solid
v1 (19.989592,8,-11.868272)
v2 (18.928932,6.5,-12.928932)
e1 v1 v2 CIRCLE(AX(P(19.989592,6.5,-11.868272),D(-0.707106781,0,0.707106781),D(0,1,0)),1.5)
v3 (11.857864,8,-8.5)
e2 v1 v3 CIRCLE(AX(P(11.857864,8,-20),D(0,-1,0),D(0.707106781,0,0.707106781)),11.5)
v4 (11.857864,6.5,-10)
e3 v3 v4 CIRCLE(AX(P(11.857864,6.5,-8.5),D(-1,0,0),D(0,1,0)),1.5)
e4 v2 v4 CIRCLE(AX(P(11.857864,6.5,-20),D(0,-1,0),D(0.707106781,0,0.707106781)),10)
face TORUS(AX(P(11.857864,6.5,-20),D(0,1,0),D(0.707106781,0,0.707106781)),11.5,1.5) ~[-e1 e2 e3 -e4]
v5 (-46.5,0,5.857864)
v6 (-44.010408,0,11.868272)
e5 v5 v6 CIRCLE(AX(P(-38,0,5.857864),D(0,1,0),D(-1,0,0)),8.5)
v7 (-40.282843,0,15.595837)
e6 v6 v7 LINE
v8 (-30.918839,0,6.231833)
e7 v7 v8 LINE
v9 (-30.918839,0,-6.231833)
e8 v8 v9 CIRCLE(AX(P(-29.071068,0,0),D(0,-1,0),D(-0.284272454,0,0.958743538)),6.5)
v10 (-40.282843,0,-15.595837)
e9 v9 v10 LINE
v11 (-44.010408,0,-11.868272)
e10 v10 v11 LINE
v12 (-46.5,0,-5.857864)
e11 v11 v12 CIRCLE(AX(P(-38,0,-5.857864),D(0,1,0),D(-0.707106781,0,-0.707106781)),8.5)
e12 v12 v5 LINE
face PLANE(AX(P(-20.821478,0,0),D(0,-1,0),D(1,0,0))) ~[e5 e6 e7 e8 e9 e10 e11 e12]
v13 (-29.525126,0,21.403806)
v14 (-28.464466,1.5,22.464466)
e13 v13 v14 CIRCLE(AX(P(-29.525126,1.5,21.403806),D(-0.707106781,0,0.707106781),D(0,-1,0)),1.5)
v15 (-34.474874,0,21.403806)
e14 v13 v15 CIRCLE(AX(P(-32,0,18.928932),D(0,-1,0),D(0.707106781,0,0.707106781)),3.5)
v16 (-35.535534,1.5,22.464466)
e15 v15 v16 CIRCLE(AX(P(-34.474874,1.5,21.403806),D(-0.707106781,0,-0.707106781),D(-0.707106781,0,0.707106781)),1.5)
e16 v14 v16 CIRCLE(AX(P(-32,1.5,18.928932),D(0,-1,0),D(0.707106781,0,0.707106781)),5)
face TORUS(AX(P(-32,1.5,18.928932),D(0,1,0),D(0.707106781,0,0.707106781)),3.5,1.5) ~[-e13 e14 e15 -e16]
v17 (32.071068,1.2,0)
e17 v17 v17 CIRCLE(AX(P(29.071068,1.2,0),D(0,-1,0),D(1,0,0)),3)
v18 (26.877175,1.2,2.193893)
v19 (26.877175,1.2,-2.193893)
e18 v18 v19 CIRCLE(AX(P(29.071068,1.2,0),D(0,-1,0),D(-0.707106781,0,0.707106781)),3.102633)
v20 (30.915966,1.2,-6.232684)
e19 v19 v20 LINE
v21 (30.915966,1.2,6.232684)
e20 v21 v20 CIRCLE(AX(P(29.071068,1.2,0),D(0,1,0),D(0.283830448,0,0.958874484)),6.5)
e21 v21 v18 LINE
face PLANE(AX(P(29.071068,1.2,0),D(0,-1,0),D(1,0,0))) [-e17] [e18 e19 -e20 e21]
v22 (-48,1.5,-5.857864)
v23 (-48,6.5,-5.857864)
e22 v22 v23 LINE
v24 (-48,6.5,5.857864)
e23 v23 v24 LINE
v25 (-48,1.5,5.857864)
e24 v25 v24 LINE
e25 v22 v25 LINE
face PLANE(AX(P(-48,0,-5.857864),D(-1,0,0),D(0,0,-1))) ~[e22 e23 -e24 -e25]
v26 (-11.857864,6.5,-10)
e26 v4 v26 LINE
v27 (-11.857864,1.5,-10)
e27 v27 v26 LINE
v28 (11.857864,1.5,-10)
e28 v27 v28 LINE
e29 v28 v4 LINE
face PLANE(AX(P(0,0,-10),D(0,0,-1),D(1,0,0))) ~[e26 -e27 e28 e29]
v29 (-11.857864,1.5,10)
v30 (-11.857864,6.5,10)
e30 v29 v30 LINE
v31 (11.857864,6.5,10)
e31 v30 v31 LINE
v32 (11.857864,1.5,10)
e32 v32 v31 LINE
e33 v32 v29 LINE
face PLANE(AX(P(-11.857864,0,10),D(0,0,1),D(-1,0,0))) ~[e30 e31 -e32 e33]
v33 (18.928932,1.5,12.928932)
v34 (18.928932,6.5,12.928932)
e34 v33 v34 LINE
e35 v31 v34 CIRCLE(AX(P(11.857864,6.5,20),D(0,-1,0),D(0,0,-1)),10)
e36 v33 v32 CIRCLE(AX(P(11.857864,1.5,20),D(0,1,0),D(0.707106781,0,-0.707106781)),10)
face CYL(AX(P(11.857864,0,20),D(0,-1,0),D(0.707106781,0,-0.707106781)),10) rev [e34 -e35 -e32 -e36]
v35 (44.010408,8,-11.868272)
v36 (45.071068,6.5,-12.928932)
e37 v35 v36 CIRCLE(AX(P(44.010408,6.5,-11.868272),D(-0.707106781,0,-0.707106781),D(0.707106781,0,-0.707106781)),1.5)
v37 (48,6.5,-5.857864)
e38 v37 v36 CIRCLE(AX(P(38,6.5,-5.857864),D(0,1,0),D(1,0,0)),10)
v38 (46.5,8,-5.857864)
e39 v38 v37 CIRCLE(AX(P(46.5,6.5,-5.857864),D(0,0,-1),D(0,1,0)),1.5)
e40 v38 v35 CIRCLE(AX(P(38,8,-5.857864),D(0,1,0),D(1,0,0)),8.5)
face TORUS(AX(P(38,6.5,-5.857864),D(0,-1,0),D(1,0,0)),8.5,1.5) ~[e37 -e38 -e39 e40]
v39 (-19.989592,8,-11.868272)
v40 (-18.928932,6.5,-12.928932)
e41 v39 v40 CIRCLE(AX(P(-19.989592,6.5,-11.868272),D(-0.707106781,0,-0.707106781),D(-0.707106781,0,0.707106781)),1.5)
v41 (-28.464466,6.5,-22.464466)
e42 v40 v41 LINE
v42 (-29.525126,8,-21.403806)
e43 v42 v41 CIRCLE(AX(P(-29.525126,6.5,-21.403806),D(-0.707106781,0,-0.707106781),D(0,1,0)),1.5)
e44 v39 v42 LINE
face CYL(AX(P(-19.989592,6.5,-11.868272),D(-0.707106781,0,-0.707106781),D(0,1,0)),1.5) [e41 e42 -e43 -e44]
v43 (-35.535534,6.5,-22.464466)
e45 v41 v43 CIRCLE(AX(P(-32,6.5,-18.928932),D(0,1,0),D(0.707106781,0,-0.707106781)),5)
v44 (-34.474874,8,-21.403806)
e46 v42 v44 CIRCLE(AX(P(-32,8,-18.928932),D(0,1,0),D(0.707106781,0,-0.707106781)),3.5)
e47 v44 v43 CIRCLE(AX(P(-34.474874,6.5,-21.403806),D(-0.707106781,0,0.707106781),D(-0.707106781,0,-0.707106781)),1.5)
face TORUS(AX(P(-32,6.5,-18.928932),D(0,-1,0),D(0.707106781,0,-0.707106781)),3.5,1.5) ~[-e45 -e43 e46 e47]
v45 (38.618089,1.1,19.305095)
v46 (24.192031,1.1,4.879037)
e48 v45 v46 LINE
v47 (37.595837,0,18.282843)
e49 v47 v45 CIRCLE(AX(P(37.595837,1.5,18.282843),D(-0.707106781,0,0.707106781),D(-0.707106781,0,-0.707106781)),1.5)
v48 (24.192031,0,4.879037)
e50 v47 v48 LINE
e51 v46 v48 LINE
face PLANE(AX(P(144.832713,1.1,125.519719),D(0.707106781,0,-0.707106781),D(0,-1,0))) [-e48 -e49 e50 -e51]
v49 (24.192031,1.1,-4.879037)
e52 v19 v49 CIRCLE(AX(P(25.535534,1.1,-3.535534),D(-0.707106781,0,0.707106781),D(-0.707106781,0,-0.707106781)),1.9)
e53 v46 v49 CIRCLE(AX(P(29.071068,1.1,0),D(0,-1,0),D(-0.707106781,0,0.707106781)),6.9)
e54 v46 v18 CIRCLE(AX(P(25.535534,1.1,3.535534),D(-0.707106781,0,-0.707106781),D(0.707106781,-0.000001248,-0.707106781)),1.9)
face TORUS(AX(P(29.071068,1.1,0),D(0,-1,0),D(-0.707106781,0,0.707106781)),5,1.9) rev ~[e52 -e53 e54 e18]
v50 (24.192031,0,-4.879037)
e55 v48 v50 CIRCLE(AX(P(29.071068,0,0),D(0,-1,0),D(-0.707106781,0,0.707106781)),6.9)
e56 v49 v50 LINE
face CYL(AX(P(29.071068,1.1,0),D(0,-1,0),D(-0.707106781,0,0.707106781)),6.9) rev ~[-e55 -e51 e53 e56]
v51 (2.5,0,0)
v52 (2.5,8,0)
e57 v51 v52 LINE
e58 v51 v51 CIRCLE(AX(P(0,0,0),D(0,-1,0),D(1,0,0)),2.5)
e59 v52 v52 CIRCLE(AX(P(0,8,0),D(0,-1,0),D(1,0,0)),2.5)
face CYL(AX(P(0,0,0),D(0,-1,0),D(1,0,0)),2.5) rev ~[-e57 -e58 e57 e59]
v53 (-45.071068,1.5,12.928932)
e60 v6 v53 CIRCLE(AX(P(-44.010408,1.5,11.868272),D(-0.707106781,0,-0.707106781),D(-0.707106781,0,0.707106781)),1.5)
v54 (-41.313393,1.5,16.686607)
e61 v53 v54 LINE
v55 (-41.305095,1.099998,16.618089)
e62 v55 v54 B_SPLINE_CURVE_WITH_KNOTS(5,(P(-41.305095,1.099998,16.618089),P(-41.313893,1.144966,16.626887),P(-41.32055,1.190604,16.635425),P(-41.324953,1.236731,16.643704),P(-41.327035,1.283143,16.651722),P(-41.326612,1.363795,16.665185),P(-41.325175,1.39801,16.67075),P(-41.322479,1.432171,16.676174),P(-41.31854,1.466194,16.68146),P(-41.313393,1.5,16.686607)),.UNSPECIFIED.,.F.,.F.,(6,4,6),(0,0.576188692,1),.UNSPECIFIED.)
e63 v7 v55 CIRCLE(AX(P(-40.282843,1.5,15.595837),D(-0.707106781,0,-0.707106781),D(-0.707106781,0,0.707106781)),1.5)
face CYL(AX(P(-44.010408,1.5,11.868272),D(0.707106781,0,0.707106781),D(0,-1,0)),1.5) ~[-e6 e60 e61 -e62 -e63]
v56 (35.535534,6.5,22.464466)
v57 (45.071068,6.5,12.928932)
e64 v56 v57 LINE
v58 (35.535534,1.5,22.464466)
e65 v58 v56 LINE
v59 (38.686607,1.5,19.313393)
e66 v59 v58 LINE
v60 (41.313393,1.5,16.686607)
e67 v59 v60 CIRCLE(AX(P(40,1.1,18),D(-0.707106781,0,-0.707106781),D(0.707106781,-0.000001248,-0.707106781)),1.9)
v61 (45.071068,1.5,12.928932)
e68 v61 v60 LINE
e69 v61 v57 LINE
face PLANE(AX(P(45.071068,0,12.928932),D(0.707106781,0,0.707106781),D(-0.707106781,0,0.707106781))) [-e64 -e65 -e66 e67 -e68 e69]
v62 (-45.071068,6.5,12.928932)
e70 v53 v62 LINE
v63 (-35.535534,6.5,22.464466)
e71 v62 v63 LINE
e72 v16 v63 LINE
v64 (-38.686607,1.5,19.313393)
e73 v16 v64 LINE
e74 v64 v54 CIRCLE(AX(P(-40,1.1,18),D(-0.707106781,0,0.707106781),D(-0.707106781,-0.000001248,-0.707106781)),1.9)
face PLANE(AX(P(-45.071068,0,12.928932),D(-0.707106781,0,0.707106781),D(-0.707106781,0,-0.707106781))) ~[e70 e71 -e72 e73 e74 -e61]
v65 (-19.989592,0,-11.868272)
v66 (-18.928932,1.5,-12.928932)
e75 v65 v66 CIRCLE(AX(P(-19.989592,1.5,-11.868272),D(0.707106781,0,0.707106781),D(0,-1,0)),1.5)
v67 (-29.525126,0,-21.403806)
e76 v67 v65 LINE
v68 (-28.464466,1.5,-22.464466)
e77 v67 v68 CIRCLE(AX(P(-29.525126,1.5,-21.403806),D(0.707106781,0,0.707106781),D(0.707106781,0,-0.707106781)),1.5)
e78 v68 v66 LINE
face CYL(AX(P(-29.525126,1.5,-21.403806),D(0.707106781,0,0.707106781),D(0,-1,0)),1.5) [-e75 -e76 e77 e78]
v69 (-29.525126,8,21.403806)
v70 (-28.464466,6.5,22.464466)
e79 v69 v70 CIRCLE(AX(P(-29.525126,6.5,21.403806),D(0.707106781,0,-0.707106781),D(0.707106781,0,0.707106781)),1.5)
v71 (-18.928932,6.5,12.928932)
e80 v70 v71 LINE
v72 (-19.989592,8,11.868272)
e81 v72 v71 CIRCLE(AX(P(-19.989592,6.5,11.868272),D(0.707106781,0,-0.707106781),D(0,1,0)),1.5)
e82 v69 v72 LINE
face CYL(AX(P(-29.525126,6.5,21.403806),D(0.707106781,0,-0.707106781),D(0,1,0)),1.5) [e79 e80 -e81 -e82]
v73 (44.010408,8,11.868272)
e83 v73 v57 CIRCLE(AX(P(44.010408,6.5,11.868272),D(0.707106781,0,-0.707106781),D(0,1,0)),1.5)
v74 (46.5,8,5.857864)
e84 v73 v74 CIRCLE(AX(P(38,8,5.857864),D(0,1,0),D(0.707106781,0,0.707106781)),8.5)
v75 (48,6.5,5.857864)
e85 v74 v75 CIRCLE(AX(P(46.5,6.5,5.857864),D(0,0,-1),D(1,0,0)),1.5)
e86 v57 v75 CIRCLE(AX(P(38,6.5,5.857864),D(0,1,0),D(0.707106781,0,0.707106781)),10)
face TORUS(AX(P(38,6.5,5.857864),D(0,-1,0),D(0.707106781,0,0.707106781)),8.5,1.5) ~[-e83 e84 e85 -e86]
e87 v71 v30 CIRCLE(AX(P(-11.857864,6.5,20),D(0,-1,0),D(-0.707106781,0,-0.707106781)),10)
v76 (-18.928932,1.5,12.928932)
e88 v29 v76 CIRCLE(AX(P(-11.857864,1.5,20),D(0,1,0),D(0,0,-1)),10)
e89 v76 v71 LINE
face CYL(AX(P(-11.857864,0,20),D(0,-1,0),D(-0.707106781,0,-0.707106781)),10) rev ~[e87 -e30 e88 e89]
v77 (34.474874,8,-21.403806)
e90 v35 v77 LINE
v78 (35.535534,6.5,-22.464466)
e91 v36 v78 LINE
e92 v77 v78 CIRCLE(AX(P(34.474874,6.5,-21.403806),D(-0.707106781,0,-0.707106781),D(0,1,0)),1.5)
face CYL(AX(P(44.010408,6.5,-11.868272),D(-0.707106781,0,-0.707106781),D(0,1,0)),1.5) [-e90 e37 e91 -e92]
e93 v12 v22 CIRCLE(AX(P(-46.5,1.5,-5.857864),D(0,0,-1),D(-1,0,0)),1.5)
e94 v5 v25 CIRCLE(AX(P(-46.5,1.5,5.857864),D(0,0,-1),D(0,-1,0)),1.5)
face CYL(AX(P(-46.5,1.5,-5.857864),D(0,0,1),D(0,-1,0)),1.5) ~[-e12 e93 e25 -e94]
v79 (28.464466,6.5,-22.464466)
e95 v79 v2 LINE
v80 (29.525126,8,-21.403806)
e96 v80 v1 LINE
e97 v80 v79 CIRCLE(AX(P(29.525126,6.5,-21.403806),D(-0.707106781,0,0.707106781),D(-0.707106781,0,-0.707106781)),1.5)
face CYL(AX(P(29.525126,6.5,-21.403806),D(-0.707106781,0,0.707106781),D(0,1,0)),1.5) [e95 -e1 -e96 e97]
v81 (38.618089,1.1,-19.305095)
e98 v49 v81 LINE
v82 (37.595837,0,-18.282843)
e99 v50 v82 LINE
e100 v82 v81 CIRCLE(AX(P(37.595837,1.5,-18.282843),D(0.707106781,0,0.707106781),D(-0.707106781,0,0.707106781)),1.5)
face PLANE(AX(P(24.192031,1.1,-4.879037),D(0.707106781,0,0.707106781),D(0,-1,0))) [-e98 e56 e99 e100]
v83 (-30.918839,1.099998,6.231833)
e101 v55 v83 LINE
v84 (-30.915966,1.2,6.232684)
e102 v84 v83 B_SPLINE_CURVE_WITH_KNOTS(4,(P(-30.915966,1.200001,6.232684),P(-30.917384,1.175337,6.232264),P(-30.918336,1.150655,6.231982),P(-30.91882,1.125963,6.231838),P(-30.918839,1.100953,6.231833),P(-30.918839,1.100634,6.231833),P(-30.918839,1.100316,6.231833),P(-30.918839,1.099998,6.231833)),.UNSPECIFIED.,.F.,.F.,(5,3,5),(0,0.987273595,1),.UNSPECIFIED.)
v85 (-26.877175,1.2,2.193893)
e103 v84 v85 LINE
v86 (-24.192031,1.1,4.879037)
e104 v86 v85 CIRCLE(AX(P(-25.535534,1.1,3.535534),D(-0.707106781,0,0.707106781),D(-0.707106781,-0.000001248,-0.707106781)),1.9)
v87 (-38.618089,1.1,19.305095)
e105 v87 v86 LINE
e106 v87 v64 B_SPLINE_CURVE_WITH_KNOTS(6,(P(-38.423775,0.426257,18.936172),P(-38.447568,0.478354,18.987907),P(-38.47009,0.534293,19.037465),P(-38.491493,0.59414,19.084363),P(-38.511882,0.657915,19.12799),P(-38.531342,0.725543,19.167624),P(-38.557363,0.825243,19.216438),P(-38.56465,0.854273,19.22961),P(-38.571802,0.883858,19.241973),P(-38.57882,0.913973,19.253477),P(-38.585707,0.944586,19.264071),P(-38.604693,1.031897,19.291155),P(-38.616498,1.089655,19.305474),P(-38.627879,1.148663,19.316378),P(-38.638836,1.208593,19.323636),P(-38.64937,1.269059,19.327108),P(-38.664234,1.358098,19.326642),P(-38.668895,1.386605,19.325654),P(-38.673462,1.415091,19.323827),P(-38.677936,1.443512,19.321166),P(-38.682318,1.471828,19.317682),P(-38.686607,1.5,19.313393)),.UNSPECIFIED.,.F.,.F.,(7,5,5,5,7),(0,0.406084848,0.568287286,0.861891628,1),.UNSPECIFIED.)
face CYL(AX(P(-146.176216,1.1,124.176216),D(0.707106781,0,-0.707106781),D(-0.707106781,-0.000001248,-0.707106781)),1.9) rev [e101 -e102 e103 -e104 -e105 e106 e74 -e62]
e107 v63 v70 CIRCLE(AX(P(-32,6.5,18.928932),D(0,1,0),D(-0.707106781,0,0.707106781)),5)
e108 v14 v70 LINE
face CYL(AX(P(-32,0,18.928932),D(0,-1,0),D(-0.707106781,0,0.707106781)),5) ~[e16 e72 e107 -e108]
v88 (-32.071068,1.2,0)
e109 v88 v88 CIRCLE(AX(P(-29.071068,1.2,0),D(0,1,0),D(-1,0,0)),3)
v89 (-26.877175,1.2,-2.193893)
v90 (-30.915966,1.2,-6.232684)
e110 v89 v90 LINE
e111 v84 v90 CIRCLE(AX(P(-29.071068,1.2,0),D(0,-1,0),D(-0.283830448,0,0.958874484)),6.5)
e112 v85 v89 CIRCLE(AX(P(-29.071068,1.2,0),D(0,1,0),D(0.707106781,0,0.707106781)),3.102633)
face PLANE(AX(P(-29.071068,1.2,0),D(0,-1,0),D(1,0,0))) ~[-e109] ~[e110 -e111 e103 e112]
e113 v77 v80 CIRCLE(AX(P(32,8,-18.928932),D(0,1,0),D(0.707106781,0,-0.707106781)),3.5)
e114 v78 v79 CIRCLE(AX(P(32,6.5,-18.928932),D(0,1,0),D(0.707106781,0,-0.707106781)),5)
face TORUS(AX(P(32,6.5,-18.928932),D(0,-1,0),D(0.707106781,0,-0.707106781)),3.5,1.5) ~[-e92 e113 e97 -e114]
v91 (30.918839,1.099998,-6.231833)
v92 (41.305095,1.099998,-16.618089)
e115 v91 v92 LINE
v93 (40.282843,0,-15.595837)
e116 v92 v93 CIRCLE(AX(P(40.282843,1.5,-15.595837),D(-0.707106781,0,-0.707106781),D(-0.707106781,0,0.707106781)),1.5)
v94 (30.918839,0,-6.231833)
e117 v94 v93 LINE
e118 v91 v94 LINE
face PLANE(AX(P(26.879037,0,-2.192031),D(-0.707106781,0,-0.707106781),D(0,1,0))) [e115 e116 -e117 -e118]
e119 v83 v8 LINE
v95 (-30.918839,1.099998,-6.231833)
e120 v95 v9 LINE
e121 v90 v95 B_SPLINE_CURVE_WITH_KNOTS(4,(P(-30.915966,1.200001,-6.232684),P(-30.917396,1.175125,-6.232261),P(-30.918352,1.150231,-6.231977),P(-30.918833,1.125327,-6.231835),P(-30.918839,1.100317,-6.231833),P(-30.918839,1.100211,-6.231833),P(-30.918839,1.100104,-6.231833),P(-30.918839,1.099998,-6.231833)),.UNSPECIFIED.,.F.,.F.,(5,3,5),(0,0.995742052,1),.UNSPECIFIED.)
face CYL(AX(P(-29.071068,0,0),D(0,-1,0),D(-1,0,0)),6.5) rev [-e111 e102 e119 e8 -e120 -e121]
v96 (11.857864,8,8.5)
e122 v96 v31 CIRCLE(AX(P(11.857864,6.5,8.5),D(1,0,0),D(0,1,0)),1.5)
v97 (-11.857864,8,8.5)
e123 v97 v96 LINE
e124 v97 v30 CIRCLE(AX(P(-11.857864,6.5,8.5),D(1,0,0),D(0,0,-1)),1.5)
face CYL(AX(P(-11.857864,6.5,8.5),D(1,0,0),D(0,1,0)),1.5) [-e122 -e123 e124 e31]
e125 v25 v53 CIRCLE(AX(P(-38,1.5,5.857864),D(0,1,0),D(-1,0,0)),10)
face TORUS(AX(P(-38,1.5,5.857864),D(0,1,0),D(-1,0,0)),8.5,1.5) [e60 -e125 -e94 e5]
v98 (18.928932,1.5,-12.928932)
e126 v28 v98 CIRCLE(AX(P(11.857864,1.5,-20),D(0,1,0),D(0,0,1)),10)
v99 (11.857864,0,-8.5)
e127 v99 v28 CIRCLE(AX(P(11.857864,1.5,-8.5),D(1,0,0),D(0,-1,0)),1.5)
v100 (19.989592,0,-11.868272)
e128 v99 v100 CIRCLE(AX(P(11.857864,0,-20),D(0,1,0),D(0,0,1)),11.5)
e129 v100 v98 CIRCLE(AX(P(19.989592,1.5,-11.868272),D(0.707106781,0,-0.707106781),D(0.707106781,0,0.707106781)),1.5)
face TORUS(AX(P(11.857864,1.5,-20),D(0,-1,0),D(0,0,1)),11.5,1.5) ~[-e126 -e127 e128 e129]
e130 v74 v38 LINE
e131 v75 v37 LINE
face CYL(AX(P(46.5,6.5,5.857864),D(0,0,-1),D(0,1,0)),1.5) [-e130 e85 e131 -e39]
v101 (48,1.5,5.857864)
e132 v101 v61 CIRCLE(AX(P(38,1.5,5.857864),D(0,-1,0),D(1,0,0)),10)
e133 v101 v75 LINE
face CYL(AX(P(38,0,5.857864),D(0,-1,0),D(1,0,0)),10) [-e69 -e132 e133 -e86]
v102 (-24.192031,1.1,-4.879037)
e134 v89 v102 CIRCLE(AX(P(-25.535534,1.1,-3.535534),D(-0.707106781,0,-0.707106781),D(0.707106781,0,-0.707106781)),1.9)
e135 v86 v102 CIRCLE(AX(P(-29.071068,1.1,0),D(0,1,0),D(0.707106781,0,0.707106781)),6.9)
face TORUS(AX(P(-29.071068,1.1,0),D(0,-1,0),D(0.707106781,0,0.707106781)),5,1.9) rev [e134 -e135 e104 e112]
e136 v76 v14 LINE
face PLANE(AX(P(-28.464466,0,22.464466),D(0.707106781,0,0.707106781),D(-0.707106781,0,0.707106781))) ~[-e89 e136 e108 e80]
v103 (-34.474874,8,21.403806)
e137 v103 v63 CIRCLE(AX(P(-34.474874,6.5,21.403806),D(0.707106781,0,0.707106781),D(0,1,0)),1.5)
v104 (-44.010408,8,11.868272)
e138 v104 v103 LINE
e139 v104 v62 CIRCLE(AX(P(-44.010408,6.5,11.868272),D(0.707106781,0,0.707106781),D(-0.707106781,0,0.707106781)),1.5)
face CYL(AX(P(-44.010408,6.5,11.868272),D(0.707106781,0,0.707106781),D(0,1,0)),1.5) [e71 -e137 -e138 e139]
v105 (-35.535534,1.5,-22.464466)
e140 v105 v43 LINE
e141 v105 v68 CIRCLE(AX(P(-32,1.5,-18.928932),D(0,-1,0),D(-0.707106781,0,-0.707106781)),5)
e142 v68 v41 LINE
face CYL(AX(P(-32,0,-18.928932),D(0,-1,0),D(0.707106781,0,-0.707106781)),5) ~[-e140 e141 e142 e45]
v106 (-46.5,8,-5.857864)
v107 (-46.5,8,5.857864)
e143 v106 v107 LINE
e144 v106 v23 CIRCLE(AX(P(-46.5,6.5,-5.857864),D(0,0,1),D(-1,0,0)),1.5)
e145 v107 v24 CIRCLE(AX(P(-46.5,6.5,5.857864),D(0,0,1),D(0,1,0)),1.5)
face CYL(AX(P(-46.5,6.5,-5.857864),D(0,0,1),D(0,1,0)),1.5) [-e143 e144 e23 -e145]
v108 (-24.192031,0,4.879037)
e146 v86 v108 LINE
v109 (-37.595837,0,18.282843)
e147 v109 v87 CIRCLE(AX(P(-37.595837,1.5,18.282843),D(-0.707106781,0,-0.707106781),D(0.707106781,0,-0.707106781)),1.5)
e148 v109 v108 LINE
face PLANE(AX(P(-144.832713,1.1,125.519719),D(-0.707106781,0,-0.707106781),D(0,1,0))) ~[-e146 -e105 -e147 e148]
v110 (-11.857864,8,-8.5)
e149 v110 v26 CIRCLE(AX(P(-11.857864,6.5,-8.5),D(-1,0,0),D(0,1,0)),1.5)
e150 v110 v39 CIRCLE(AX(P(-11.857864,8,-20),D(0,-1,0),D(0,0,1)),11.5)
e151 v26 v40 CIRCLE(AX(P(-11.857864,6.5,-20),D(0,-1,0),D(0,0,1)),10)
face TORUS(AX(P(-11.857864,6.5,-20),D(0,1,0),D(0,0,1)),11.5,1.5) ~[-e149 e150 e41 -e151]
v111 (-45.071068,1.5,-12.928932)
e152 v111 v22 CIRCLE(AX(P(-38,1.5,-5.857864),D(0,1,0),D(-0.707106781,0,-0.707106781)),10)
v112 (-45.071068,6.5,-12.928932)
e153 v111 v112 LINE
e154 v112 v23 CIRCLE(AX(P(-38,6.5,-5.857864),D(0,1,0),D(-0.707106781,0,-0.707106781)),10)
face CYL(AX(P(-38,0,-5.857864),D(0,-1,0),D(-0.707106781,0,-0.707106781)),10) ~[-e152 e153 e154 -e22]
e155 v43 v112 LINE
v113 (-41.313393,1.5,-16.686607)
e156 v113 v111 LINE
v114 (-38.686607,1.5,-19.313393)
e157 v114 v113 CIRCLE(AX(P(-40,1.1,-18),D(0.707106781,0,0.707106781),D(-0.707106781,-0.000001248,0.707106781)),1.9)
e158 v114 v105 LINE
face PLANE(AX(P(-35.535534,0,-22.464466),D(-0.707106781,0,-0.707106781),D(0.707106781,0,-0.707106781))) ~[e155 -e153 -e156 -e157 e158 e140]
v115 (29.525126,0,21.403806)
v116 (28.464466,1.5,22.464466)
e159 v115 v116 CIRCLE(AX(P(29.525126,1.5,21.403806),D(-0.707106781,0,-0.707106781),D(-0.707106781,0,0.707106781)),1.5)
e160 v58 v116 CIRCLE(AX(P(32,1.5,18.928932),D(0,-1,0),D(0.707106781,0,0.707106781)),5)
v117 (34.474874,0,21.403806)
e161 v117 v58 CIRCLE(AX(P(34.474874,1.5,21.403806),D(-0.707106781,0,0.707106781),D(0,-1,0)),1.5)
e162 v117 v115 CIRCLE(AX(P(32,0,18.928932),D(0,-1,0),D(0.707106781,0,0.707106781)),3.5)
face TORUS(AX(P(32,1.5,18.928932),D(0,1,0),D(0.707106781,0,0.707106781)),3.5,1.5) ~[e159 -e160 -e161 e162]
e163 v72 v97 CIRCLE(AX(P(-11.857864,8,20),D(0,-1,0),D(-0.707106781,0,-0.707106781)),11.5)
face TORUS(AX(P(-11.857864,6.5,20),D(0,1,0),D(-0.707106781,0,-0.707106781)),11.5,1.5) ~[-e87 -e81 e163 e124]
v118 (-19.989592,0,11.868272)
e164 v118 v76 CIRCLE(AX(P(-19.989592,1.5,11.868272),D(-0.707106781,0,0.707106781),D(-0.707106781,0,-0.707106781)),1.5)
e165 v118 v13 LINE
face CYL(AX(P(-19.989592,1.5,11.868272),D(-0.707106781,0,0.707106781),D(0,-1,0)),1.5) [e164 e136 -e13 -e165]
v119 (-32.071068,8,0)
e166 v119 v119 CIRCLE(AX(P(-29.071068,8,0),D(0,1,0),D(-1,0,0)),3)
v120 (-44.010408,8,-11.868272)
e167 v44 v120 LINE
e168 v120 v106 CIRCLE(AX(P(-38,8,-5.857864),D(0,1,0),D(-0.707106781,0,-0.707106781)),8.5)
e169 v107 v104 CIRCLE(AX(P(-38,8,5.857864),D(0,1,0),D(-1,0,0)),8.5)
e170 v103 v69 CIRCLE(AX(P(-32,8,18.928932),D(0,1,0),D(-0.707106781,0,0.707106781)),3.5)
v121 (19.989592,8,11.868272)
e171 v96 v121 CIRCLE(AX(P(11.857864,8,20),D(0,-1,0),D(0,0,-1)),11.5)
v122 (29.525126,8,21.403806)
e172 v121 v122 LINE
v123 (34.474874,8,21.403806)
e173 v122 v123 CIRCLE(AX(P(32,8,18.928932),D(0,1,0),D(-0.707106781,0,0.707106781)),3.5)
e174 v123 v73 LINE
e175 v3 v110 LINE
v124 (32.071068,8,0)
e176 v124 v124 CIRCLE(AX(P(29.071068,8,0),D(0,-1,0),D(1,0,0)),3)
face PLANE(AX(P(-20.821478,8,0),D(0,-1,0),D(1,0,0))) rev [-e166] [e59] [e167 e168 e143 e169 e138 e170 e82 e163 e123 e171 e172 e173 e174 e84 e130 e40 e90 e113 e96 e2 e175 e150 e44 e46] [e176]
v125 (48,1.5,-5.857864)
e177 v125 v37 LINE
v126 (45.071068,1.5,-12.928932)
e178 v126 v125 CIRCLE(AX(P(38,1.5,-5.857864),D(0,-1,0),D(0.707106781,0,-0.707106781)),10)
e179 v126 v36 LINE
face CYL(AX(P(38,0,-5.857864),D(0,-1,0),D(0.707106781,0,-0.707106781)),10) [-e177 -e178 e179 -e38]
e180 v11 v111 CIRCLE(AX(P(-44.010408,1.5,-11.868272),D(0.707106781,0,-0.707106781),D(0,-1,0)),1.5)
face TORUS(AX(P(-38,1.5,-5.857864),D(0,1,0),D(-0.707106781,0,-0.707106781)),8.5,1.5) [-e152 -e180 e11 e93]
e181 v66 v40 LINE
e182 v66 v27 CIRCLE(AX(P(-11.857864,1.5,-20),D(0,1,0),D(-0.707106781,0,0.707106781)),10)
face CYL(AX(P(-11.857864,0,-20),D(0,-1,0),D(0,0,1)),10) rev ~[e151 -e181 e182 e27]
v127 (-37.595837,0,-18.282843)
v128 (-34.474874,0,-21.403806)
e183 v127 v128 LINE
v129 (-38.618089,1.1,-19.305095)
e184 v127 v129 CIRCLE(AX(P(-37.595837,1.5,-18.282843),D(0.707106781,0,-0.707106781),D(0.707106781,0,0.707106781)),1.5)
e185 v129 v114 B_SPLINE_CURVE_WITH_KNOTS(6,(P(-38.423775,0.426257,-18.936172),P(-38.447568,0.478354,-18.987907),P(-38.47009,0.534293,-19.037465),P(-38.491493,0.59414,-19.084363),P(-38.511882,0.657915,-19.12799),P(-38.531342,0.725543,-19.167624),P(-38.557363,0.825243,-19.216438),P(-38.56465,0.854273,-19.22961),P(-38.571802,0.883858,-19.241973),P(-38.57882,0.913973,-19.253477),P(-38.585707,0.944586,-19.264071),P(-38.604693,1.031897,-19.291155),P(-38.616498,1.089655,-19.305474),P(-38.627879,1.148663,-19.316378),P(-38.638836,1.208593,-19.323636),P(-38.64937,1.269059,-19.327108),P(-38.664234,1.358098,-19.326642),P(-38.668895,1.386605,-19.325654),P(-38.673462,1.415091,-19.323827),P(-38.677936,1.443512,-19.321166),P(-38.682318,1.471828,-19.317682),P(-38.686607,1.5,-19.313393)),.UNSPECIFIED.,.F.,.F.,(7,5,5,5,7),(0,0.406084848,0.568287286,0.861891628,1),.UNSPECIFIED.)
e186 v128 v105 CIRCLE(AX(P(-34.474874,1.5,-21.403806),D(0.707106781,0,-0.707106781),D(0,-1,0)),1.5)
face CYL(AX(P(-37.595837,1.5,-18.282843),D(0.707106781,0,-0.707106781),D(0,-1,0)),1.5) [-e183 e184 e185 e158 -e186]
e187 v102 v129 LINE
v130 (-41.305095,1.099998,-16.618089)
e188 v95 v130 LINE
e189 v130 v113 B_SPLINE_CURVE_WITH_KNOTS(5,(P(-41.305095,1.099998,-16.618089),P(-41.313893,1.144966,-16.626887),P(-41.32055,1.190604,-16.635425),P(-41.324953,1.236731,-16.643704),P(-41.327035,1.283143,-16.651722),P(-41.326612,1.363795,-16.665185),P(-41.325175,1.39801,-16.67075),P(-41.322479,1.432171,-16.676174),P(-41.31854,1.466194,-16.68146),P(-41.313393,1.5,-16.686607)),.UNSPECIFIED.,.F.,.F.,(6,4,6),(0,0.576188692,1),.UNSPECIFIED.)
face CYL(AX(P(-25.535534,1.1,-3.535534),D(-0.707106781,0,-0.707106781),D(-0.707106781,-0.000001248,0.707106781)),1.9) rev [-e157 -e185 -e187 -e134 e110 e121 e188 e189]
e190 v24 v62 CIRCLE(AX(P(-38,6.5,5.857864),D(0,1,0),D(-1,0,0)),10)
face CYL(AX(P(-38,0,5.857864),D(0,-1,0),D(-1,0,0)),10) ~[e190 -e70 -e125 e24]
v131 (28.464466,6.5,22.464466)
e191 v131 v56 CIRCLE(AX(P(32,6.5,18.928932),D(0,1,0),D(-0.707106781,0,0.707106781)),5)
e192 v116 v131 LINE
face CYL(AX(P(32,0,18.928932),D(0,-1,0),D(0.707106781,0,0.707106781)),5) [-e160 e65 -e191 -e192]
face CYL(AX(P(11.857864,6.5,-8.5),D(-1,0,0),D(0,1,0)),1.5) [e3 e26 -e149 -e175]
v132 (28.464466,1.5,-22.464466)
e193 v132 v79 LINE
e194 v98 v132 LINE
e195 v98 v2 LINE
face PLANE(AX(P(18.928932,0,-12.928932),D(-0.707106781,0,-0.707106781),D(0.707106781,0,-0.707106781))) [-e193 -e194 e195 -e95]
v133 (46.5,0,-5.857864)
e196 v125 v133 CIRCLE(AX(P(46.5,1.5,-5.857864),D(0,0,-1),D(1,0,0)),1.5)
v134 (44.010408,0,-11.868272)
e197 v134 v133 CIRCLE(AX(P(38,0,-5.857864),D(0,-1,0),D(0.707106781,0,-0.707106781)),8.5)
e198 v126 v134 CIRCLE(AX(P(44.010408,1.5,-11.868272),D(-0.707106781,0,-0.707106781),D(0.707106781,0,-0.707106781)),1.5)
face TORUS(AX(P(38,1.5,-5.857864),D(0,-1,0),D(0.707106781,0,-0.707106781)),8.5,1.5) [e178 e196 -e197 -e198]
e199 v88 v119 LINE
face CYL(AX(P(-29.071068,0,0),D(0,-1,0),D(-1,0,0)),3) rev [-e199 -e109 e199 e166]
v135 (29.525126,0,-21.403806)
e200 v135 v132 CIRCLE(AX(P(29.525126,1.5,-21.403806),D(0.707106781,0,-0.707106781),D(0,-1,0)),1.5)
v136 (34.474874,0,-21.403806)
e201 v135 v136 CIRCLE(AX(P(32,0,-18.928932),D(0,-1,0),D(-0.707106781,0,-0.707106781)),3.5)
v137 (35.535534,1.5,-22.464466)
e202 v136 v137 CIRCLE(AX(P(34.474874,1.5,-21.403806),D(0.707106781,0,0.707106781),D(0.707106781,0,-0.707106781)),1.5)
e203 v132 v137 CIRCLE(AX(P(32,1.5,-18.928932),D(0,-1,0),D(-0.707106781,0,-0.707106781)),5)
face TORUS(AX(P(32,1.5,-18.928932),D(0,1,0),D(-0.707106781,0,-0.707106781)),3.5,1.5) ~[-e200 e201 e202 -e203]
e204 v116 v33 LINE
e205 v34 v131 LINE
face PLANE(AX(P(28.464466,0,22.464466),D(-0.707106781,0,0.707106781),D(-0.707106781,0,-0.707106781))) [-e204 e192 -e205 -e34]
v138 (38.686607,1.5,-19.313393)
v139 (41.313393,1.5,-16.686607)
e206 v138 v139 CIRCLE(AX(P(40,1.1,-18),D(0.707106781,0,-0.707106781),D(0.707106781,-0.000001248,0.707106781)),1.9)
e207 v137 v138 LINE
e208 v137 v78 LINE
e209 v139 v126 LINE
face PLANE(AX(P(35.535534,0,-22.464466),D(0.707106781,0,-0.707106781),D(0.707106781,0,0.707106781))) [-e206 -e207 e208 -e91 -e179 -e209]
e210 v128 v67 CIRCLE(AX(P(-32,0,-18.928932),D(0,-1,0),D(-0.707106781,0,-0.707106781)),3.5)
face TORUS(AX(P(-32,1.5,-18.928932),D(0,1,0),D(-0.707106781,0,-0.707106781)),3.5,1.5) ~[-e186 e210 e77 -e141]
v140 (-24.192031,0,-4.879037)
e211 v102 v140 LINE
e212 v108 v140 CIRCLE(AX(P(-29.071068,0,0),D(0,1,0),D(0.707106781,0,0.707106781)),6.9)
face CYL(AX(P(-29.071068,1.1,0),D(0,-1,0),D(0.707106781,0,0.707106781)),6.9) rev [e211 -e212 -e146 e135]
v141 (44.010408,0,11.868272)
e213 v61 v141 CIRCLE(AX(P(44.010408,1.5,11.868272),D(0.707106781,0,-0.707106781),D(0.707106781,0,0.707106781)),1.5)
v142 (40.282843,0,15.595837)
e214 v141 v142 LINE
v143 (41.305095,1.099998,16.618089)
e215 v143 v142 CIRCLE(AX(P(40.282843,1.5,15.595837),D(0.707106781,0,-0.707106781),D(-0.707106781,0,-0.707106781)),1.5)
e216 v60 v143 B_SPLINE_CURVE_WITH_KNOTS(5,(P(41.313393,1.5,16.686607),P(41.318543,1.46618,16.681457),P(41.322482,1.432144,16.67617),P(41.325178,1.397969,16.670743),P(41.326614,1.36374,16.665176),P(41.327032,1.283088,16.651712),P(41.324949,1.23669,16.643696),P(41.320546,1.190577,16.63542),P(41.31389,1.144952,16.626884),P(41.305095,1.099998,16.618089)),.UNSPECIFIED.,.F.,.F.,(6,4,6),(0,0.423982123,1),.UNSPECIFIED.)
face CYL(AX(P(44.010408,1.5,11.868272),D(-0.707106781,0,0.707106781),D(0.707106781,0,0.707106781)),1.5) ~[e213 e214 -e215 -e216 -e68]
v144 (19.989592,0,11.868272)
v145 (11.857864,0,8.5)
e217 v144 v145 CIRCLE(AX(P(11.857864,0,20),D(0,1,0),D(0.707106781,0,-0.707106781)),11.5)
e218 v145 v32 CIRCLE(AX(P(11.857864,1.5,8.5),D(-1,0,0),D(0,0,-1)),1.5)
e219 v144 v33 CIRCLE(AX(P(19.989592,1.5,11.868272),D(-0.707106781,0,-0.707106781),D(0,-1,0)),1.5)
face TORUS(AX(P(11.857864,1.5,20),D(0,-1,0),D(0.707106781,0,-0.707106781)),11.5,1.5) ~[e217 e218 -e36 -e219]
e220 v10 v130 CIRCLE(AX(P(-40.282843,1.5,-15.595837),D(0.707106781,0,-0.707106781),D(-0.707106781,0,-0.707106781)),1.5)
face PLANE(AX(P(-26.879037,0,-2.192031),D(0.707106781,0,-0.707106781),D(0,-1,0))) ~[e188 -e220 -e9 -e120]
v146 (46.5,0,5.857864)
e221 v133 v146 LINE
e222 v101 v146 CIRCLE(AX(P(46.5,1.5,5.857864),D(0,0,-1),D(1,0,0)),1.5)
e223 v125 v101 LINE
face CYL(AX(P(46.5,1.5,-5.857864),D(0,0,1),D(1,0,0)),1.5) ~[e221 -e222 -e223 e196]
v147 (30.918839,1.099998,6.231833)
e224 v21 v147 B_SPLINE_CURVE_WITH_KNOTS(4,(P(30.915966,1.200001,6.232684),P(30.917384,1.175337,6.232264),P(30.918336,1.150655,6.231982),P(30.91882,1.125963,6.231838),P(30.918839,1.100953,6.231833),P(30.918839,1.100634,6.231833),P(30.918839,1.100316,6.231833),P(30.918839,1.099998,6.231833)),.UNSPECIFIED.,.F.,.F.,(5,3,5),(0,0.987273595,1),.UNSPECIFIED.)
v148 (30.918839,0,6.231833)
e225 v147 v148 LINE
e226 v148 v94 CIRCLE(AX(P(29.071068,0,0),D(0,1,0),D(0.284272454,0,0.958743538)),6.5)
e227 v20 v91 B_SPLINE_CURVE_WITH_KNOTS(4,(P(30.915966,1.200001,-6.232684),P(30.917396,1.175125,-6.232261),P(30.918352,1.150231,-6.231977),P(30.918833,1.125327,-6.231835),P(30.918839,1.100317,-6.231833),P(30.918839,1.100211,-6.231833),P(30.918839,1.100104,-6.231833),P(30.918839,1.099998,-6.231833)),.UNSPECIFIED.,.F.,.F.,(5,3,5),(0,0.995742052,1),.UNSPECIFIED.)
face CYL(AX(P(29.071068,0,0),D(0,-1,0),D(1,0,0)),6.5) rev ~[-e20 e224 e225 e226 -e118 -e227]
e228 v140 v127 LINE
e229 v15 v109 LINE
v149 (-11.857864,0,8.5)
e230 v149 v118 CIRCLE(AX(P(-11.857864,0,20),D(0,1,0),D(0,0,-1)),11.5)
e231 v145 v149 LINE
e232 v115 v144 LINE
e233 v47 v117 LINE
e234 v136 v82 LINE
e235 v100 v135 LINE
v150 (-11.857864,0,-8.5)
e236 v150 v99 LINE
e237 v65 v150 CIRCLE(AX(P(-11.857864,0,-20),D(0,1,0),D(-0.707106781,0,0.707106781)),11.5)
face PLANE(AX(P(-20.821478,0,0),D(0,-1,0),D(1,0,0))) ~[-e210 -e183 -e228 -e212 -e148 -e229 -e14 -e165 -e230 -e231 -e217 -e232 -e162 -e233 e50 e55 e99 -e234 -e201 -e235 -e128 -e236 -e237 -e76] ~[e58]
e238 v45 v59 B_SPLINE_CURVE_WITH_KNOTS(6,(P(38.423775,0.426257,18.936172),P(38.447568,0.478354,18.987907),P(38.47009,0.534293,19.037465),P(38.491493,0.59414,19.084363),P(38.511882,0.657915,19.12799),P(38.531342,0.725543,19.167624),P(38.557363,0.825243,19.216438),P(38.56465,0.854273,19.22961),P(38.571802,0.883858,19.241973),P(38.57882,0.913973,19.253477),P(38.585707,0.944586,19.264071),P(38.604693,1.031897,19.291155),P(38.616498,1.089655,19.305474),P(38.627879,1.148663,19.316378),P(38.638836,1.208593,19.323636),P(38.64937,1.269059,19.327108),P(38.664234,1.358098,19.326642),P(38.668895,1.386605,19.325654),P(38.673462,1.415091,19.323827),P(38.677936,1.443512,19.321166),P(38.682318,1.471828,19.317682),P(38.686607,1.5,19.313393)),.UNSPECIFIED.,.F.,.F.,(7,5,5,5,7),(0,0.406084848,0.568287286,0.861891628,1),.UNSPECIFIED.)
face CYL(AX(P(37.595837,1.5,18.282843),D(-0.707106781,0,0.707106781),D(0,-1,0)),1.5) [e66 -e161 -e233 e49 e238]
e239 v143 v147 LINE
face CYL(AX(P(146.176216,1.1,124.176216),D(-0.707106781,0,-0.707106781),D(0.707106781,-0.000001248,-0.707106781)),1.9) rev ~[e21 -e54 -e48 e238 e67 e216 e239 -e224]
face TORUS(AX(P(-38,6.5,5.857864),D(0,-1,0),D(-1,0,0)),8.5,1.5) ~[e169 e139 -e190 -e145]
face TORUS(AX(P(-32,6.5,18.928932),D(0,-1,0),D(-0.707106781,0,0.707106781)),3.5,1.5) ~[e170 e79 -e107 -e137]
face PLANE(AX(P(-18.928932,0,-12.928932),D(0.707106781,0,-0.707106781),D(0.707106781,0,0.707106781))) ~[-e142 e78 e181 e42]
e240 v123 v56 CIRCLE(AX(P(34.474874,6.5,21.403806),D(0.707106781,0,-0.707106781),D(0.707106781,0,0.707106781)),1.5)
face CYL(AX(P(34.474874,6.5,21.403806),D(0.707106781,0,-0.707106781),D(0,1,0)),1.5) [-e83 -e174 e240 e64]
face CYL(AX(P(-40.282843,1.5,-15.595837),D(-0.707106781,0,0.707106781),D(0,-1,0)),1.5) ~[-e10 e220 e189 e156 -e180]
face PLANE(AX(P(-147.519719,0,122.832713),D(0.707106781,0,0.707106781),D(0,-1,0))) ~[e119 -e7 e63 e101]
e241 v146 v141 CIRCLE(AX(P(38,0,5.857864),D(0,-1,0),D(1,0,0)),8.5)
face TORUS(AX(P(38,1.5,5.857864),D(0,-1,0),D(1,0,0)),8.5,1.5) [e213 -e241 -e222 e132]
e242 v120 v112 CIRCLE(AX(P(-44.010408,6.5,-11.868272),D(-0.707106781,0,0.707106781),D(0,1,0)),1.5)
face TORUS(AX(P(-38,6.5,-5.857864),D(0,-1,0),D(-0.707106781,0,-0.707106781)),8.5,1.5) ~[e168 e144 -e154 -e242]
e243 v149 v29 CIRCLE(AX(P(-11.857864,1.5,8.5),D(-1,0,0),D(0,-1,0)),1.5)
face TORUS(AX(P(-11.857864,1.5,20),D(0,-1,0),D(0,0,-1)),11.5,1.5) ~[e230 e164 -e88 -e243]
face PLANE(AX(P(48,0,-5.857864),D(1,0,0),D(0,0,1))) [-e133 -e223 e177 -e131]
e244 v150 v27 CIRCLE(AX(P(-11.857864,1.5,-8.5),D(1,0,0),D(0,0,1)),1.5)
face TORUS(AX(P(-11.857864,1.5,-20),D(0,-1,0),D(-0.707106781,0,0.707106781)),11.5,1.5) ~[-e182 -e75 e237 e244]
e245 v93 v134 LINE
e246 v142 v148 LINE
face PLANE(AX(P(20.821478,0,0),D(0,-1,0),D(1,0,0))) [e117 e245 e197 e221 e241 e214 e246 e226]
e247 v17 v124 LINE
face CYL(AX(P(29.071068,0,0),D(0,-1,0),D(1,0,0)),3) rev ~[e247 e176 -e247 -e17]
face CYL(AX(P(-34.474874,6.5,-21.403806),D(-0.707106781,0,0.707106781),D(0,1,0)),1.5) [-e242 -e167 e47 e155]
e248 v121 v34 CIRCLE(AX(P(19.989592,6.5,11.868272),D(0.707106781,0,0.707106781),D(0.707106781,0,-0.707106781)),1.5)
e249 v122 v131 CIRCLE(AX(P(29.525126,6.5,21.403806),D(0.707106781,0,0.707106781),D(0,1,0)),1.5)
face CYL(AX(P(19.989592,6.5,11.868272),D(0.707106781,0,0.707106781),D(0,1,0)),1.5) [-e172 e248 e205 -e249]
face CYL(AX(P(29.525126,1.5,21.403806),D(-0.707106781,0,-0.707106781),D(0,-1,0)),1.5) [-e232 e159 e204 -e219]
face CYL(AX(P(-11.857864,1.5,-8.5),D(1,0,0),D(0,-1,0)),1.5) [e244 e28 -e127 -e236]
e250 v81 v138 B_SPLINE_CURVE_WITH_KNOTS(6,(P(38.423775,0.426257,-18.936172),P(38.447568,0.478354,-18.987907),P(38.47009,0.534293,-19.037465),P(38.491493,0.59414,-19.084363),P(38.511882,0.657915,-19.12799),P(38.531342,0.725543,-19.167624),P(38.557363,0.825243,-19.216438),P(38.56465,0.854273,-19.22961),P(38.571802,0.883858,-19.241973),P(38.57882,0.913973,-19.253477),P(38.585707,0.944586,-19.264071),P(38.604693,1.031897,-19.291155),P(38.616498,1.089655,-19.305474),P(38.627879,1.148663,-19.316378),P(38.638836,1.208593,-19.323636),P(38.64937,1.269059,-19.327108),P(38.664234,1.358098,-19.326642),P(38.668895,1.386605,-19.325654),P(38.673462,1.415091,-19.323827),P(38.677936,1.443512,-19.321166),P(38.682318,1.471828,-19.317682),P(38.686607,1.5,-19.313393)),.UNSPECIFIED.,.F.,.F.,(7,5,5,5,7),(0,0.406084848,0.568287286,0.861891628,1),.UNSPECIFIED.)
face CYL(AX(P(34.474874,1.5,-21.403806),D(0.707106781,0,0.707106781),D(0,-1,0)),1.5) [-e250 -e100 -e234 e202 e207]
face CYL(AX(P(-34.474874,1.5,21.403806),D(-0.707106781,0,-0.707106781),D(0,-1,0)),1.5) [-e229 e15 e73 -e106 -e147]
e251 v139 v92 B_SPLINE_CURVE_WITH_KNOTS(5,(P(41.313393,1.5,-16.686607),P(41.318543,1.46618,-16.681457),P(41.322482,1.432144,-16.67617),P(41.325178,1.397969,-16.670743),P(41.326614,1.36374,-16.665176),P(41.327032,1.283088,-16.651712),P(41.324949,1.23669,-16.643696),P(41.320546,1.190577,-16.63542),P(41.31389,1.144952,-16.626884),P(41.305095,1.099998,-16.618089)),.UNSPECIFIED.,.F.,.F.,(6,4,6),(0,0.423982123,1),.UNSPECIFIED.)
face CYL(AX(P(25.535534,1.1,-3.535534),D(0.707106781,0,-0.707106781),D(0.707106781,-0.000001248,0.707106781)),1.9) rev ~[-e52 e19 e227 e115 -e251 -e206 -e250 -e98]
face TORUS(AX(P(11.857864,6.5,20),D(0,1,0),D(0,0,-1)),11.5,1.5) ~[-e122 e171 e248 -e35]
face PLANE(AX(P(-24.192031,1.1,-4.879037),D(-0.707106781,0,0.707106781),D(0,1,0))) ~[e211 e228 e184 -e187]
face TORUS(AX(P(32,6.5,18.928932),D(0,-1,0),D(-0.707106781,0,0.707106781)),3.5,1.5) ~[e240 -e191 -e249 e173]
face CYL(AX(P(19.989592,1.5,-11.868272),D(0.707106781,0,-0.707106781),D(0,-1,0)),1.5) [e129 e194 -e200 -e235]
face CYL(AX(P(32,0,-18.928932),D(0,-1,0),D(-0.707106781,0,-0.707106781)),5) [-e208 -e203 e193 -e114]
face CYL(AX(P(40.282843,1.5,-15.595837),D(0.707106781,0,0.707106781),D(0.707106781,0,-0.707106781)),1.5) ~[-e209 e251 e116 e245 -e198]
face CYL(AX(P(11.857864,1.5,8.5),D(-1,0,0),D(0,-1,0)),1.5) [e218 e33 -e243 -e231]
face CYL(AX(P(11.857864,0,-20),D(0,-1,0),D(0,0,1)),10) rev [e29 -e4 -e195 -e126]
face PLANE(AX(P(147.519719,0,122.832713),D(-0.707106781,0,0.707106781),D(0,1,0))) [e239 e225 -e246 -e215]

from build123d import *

# Parameters (mm, degrees)
F1_DEPTH  = 8
F4_R      = 6.5
F5_DEPTH  = 1.2
F6_R      = 3
F7_DEPTH  = 38
F9_R      = 2.5
F10_DEPTH = 22
F11_R     = 1.5


# Not quite as in the source:
# - a feature names something its author has since deleted; it is built from what else it names


with BuildPart() as f1:
    # F0 (on Front) → F1 (new body)
    with BuildSketch(Plane.XZ):
        with BuildLine():
            ThreePointArc((24.1920310217, -4.8790367902), (22.1710678119, 0), (24.1920310217, 4.8790367902))
            Line((24.1920310217, 4.8790367902), (38.6564971157, 19.3435028843))
            Line((38.6564971157, 19.3435028843), (35.5355339059, 22.4644660941))
            ThreePointArc((35.5355339059, 22.4644660941), (32, 23.9289321881), (28.4644660941, 22.4644660941))
            Line((28.4644660941, 22.4644660941), (18.9289321881, 12.9289321881))
            ThreePointArc((18.9289321881, 12.9289321881), (15.6846986999, 10.7612046749), (11.8578643763, 10))
            Line((11.8578643763, 10), (0, 10))
            Line((0, 10), (0, 0))
            Line((0, 0), (0, -10))
            Line((0, -10), (11.8578643763, -10))
            ThreePointArc((11.8578643763, -10), (15.6846986999, -10.7612046749), (18.9289321881, -12.9289321881))
            Line((18.9289321881, -12.9289321881), (28.4644660941, -22.4644660941))
            ThreePointArc((28.4644660941, -22.4644660941), (32, -23.9289321881), (35.5355339059, -22.4644660941))
            Line((35.5355339059, -22.4644660941), (38.6564971157, -19.3435028843))
            Line((38.6564971157, -19.3435028843), (24.1920310217, -4.8790367902))
        make_face()
        with BuildLine():
            Line((38.6564971157, 19.3435028843), (24.1920310217, 4.8790367902))
            ThreePointArc((24.1920310217, 4.8790367902), (22.1710678119, 0), (24.1920310217, -4.8790367902))
            Line((24.1920310217, -4.8790367902), (38.6564971157, -19.3435028843))
            Line((38.6564971157, -19.3435028843), (41.3435028843, -16.6564971157))
            Line((41.3435028843, -16.6564971157), (30.9188387655, -6.231832997))
            ThreePointArc((30.9188387655, -6.231832997), (22.5710678119, 0), (30.9188387655, 6.231832997))
            Line((30.9188387655, 6.231832997), (41.3435028843, 16.6564971157))
            Line((41.3435028843, 16.6564971157), (38.6564971157, 19.3435028843))
        make_face()
        with BuildLine():
            Line((45.0710678119, 12.9289321881), (41.3435028843, 16.6564971157))
            Line((41.3435028843, 16.6564971157), (30.9188387655, 6.231832997))
            ThreePointArc((30.9188387655, 6.231832997), (34.2797390051, 3.8884115524), (35.5710678119, 0))
            ThreePointArc((35.5710678119, 0), (34.2797390051, -3.8884115524), (30.9188387655, -6.231832997))
            Line((30.9188387655, -6.231832997), (41.3435028843, -16.6564971157))
            Line((41.3435028843, -16.6564971157), (45.0710678119, -12.9289321881))
            ThreePointArc((45.0710678119, -12.9289321881), (47.2387953251, -9.6846986999), (48, -5.8578643763))
            Line((48, -5.8578643763), (48, 5.8578643763))
            ThreePointArc((48, 5.8578643763), (47.2387953251, 9.6846986999), (45.0710678119, 12.9289321881))
        make_face()
        with BuildLine():
            ThreePointArc((35.5710678119, 0), (34.2797390051, 3.8884115524), (30.9188387655, 6.231832997))
            Line((30.9188387655, 6.231832997), (26.8790367902, 2.1920310217))
            ThreePointArc((26.8790367902, 2.1920310217), (25.9710678119, 0), (26.8790367902, -2.1920310217))
            Line((26.8790367902, -2.1920310217), (30.9188387655, -6.231832997))
            ThreePointArc((30.9188387655, -6.231832997), (34.2797390051, -3.8884115524), (35.5710678119, 0))
        make_face()
        with BuildLine():
            Line((26.8790367902, 2.1920310217), (30.9188387655, 6.231832997))
            ThreePointArc((30.9188387655, 6.231832997), (22.5710678119, 0), (30.9188387655, -6.231832997))
            Line((30.9188387655, -6.231832997), (26.8790367902, -2.1920310217))
            ThreePointArc((26.8790367902, -2.1920310217), (25.9710678119, 0), (26.8790367902, 2.1920310217))
        make_face()
    extrude(amount=-F1_DEPTH)

    # F3: sweep along a path in F0
    with BuildLine(Plane.XZ) as f3_path:
        Line((144.8327134998, 125.5197192683), (24.1920310217, 4.8790367902))
        ThreePointArc((24.1920310217, 4.8790367902), (22.1710678119, 0), (24.1920310217, -4.8790367902))
        Line((24.1920310217, -4.8790367902), (136.4443398617, -117.1313456302))
    # F2 (on face) → F3 (sweep, cut)
    with BuildSketch(Plane(origin=(29, 0, 29), x_dir=(0.7071067812, 0, -0.7071067812), z_dir=(0.7071067812, 0, 0.7071067812))):
        with BuildLine():
            Line((13.6563491861, 0), (17.4563491861, 0))
            Line((17.4563491861, 0), (17.4563491861, 1.0999976279))
            ThreePointArc((17.4563491861, 1.0999976279), (15.5563503722, 3), (13.6563491861, 1.1))
            Line((13.6563491861, 1.1), (13.6563491861, 0))
        make_face()
    sweep(path=f3_path.line, mode=Mode.SUBTRACT)

    # F4 (on face) → F5 (cut)
    with BuildSketch(Plane.XZ):
        with Locations((29.0710678119, 0)):
            Circle(F4_R)
    extrude(amount=-F5_DEPTH, mode=Mode.SUBTRACT)

    # F6 (on face) → F7 (cut)
    with BuildSketch(Plane.XZ):
        with Locations((29.0710678119, 0)):
            Circle(F6_R)
    extrude(amount=-F7_DEPTH, mode=Mode.SUBTRACT)

    # F8: F1 across plane


with BuildPart() as f1_1:
    add(f1.part)
    add(f1.part.mirror(Plane.YZ))

    # F9 (on face) → F10 (cut)
    with BuildSketch(Plane.XZ):
        Circle(F9_R)
    extrude(amount=-F10_DEPTH, mode=Mode.SUBTRACT)

    # F11
    f11_edges = [f1_1.edges().sort_by_distance(p)[0] for p in [
        (47.238795, 0, -9.684699),
        (23.696699, 0, 17.696699),
        (-48, 0, 0),
        (0, 0, -10),
        (0, 8, -10),
        (32, 0, 23.928932),
        (32, 8, 23.928932),
        (43.207285, 0, 14.792715),
        (37.096016, 0, 20.903984),
        (40.303301, 8, 17.696699),
        (23.696699, 8, 17.696699),
        (15.684699, 0, 10.761205),
        (37.096016, 0, -20.903984),
        (0, 0, 10),
        (32, 0, -23.928932),
        (-15.684699, 0, 10.761205),
        (23.696699, 0, -17.696699),
        (-23.696699, 0, 17.696699),
        (15.684699, 0, -10.761205),
        (-32, 0, 23.928932),
        (-37.096016, 0, 20.903984),
        (-15.684699, 0, -10.761205),
        (-23.696699, 0, -17.696699),
        (-32, 0, -23.928932),
        (-37.096016, 0, -20.903984),
        (47.238795, 8, 9.684699),
        (15.684699, 8, 10.761205),
        (48, 8, 0),
        (0, 8, 10),
        (47.238795, 8, -9.684699),
        (-15.684699, 8, 10.761205),
        (40.303301, 8, -17.696699),
        (-23.696699, 8, 17.696699),
        (32, 8, -23.928932),
        (-32, 8, 23.928932),
        (23.696699, 8, -17.696699),
        (-40.303301, 8, 17.696699),
        (15.684699, 8, -10.761205),
        (-47.238795, 8, 9.684699),
        (-48, 8, 0),
        (-15.684699, 8, -10.761205),
        (-47.238795, 8, -9.684699),
        (-23.696699, 8, -17.696699),
        (-40.303301, 8, -17.696699),
        (-32, 8, -23.928932),
        (47.238795, 0, 9.684699),
        (43.207285, 0, -14.792715),
        (48, 0, 0),
        (-43.207285, 0, 14.792715),
        (-43.207285, 0, -14.792715),
        (-47.238795, 0, 9.684699),
        (-47.238795, 0, -9.684699),
    ]]
    fillet(f11_edges, radius=F11_R)


solid = f1_1.part
